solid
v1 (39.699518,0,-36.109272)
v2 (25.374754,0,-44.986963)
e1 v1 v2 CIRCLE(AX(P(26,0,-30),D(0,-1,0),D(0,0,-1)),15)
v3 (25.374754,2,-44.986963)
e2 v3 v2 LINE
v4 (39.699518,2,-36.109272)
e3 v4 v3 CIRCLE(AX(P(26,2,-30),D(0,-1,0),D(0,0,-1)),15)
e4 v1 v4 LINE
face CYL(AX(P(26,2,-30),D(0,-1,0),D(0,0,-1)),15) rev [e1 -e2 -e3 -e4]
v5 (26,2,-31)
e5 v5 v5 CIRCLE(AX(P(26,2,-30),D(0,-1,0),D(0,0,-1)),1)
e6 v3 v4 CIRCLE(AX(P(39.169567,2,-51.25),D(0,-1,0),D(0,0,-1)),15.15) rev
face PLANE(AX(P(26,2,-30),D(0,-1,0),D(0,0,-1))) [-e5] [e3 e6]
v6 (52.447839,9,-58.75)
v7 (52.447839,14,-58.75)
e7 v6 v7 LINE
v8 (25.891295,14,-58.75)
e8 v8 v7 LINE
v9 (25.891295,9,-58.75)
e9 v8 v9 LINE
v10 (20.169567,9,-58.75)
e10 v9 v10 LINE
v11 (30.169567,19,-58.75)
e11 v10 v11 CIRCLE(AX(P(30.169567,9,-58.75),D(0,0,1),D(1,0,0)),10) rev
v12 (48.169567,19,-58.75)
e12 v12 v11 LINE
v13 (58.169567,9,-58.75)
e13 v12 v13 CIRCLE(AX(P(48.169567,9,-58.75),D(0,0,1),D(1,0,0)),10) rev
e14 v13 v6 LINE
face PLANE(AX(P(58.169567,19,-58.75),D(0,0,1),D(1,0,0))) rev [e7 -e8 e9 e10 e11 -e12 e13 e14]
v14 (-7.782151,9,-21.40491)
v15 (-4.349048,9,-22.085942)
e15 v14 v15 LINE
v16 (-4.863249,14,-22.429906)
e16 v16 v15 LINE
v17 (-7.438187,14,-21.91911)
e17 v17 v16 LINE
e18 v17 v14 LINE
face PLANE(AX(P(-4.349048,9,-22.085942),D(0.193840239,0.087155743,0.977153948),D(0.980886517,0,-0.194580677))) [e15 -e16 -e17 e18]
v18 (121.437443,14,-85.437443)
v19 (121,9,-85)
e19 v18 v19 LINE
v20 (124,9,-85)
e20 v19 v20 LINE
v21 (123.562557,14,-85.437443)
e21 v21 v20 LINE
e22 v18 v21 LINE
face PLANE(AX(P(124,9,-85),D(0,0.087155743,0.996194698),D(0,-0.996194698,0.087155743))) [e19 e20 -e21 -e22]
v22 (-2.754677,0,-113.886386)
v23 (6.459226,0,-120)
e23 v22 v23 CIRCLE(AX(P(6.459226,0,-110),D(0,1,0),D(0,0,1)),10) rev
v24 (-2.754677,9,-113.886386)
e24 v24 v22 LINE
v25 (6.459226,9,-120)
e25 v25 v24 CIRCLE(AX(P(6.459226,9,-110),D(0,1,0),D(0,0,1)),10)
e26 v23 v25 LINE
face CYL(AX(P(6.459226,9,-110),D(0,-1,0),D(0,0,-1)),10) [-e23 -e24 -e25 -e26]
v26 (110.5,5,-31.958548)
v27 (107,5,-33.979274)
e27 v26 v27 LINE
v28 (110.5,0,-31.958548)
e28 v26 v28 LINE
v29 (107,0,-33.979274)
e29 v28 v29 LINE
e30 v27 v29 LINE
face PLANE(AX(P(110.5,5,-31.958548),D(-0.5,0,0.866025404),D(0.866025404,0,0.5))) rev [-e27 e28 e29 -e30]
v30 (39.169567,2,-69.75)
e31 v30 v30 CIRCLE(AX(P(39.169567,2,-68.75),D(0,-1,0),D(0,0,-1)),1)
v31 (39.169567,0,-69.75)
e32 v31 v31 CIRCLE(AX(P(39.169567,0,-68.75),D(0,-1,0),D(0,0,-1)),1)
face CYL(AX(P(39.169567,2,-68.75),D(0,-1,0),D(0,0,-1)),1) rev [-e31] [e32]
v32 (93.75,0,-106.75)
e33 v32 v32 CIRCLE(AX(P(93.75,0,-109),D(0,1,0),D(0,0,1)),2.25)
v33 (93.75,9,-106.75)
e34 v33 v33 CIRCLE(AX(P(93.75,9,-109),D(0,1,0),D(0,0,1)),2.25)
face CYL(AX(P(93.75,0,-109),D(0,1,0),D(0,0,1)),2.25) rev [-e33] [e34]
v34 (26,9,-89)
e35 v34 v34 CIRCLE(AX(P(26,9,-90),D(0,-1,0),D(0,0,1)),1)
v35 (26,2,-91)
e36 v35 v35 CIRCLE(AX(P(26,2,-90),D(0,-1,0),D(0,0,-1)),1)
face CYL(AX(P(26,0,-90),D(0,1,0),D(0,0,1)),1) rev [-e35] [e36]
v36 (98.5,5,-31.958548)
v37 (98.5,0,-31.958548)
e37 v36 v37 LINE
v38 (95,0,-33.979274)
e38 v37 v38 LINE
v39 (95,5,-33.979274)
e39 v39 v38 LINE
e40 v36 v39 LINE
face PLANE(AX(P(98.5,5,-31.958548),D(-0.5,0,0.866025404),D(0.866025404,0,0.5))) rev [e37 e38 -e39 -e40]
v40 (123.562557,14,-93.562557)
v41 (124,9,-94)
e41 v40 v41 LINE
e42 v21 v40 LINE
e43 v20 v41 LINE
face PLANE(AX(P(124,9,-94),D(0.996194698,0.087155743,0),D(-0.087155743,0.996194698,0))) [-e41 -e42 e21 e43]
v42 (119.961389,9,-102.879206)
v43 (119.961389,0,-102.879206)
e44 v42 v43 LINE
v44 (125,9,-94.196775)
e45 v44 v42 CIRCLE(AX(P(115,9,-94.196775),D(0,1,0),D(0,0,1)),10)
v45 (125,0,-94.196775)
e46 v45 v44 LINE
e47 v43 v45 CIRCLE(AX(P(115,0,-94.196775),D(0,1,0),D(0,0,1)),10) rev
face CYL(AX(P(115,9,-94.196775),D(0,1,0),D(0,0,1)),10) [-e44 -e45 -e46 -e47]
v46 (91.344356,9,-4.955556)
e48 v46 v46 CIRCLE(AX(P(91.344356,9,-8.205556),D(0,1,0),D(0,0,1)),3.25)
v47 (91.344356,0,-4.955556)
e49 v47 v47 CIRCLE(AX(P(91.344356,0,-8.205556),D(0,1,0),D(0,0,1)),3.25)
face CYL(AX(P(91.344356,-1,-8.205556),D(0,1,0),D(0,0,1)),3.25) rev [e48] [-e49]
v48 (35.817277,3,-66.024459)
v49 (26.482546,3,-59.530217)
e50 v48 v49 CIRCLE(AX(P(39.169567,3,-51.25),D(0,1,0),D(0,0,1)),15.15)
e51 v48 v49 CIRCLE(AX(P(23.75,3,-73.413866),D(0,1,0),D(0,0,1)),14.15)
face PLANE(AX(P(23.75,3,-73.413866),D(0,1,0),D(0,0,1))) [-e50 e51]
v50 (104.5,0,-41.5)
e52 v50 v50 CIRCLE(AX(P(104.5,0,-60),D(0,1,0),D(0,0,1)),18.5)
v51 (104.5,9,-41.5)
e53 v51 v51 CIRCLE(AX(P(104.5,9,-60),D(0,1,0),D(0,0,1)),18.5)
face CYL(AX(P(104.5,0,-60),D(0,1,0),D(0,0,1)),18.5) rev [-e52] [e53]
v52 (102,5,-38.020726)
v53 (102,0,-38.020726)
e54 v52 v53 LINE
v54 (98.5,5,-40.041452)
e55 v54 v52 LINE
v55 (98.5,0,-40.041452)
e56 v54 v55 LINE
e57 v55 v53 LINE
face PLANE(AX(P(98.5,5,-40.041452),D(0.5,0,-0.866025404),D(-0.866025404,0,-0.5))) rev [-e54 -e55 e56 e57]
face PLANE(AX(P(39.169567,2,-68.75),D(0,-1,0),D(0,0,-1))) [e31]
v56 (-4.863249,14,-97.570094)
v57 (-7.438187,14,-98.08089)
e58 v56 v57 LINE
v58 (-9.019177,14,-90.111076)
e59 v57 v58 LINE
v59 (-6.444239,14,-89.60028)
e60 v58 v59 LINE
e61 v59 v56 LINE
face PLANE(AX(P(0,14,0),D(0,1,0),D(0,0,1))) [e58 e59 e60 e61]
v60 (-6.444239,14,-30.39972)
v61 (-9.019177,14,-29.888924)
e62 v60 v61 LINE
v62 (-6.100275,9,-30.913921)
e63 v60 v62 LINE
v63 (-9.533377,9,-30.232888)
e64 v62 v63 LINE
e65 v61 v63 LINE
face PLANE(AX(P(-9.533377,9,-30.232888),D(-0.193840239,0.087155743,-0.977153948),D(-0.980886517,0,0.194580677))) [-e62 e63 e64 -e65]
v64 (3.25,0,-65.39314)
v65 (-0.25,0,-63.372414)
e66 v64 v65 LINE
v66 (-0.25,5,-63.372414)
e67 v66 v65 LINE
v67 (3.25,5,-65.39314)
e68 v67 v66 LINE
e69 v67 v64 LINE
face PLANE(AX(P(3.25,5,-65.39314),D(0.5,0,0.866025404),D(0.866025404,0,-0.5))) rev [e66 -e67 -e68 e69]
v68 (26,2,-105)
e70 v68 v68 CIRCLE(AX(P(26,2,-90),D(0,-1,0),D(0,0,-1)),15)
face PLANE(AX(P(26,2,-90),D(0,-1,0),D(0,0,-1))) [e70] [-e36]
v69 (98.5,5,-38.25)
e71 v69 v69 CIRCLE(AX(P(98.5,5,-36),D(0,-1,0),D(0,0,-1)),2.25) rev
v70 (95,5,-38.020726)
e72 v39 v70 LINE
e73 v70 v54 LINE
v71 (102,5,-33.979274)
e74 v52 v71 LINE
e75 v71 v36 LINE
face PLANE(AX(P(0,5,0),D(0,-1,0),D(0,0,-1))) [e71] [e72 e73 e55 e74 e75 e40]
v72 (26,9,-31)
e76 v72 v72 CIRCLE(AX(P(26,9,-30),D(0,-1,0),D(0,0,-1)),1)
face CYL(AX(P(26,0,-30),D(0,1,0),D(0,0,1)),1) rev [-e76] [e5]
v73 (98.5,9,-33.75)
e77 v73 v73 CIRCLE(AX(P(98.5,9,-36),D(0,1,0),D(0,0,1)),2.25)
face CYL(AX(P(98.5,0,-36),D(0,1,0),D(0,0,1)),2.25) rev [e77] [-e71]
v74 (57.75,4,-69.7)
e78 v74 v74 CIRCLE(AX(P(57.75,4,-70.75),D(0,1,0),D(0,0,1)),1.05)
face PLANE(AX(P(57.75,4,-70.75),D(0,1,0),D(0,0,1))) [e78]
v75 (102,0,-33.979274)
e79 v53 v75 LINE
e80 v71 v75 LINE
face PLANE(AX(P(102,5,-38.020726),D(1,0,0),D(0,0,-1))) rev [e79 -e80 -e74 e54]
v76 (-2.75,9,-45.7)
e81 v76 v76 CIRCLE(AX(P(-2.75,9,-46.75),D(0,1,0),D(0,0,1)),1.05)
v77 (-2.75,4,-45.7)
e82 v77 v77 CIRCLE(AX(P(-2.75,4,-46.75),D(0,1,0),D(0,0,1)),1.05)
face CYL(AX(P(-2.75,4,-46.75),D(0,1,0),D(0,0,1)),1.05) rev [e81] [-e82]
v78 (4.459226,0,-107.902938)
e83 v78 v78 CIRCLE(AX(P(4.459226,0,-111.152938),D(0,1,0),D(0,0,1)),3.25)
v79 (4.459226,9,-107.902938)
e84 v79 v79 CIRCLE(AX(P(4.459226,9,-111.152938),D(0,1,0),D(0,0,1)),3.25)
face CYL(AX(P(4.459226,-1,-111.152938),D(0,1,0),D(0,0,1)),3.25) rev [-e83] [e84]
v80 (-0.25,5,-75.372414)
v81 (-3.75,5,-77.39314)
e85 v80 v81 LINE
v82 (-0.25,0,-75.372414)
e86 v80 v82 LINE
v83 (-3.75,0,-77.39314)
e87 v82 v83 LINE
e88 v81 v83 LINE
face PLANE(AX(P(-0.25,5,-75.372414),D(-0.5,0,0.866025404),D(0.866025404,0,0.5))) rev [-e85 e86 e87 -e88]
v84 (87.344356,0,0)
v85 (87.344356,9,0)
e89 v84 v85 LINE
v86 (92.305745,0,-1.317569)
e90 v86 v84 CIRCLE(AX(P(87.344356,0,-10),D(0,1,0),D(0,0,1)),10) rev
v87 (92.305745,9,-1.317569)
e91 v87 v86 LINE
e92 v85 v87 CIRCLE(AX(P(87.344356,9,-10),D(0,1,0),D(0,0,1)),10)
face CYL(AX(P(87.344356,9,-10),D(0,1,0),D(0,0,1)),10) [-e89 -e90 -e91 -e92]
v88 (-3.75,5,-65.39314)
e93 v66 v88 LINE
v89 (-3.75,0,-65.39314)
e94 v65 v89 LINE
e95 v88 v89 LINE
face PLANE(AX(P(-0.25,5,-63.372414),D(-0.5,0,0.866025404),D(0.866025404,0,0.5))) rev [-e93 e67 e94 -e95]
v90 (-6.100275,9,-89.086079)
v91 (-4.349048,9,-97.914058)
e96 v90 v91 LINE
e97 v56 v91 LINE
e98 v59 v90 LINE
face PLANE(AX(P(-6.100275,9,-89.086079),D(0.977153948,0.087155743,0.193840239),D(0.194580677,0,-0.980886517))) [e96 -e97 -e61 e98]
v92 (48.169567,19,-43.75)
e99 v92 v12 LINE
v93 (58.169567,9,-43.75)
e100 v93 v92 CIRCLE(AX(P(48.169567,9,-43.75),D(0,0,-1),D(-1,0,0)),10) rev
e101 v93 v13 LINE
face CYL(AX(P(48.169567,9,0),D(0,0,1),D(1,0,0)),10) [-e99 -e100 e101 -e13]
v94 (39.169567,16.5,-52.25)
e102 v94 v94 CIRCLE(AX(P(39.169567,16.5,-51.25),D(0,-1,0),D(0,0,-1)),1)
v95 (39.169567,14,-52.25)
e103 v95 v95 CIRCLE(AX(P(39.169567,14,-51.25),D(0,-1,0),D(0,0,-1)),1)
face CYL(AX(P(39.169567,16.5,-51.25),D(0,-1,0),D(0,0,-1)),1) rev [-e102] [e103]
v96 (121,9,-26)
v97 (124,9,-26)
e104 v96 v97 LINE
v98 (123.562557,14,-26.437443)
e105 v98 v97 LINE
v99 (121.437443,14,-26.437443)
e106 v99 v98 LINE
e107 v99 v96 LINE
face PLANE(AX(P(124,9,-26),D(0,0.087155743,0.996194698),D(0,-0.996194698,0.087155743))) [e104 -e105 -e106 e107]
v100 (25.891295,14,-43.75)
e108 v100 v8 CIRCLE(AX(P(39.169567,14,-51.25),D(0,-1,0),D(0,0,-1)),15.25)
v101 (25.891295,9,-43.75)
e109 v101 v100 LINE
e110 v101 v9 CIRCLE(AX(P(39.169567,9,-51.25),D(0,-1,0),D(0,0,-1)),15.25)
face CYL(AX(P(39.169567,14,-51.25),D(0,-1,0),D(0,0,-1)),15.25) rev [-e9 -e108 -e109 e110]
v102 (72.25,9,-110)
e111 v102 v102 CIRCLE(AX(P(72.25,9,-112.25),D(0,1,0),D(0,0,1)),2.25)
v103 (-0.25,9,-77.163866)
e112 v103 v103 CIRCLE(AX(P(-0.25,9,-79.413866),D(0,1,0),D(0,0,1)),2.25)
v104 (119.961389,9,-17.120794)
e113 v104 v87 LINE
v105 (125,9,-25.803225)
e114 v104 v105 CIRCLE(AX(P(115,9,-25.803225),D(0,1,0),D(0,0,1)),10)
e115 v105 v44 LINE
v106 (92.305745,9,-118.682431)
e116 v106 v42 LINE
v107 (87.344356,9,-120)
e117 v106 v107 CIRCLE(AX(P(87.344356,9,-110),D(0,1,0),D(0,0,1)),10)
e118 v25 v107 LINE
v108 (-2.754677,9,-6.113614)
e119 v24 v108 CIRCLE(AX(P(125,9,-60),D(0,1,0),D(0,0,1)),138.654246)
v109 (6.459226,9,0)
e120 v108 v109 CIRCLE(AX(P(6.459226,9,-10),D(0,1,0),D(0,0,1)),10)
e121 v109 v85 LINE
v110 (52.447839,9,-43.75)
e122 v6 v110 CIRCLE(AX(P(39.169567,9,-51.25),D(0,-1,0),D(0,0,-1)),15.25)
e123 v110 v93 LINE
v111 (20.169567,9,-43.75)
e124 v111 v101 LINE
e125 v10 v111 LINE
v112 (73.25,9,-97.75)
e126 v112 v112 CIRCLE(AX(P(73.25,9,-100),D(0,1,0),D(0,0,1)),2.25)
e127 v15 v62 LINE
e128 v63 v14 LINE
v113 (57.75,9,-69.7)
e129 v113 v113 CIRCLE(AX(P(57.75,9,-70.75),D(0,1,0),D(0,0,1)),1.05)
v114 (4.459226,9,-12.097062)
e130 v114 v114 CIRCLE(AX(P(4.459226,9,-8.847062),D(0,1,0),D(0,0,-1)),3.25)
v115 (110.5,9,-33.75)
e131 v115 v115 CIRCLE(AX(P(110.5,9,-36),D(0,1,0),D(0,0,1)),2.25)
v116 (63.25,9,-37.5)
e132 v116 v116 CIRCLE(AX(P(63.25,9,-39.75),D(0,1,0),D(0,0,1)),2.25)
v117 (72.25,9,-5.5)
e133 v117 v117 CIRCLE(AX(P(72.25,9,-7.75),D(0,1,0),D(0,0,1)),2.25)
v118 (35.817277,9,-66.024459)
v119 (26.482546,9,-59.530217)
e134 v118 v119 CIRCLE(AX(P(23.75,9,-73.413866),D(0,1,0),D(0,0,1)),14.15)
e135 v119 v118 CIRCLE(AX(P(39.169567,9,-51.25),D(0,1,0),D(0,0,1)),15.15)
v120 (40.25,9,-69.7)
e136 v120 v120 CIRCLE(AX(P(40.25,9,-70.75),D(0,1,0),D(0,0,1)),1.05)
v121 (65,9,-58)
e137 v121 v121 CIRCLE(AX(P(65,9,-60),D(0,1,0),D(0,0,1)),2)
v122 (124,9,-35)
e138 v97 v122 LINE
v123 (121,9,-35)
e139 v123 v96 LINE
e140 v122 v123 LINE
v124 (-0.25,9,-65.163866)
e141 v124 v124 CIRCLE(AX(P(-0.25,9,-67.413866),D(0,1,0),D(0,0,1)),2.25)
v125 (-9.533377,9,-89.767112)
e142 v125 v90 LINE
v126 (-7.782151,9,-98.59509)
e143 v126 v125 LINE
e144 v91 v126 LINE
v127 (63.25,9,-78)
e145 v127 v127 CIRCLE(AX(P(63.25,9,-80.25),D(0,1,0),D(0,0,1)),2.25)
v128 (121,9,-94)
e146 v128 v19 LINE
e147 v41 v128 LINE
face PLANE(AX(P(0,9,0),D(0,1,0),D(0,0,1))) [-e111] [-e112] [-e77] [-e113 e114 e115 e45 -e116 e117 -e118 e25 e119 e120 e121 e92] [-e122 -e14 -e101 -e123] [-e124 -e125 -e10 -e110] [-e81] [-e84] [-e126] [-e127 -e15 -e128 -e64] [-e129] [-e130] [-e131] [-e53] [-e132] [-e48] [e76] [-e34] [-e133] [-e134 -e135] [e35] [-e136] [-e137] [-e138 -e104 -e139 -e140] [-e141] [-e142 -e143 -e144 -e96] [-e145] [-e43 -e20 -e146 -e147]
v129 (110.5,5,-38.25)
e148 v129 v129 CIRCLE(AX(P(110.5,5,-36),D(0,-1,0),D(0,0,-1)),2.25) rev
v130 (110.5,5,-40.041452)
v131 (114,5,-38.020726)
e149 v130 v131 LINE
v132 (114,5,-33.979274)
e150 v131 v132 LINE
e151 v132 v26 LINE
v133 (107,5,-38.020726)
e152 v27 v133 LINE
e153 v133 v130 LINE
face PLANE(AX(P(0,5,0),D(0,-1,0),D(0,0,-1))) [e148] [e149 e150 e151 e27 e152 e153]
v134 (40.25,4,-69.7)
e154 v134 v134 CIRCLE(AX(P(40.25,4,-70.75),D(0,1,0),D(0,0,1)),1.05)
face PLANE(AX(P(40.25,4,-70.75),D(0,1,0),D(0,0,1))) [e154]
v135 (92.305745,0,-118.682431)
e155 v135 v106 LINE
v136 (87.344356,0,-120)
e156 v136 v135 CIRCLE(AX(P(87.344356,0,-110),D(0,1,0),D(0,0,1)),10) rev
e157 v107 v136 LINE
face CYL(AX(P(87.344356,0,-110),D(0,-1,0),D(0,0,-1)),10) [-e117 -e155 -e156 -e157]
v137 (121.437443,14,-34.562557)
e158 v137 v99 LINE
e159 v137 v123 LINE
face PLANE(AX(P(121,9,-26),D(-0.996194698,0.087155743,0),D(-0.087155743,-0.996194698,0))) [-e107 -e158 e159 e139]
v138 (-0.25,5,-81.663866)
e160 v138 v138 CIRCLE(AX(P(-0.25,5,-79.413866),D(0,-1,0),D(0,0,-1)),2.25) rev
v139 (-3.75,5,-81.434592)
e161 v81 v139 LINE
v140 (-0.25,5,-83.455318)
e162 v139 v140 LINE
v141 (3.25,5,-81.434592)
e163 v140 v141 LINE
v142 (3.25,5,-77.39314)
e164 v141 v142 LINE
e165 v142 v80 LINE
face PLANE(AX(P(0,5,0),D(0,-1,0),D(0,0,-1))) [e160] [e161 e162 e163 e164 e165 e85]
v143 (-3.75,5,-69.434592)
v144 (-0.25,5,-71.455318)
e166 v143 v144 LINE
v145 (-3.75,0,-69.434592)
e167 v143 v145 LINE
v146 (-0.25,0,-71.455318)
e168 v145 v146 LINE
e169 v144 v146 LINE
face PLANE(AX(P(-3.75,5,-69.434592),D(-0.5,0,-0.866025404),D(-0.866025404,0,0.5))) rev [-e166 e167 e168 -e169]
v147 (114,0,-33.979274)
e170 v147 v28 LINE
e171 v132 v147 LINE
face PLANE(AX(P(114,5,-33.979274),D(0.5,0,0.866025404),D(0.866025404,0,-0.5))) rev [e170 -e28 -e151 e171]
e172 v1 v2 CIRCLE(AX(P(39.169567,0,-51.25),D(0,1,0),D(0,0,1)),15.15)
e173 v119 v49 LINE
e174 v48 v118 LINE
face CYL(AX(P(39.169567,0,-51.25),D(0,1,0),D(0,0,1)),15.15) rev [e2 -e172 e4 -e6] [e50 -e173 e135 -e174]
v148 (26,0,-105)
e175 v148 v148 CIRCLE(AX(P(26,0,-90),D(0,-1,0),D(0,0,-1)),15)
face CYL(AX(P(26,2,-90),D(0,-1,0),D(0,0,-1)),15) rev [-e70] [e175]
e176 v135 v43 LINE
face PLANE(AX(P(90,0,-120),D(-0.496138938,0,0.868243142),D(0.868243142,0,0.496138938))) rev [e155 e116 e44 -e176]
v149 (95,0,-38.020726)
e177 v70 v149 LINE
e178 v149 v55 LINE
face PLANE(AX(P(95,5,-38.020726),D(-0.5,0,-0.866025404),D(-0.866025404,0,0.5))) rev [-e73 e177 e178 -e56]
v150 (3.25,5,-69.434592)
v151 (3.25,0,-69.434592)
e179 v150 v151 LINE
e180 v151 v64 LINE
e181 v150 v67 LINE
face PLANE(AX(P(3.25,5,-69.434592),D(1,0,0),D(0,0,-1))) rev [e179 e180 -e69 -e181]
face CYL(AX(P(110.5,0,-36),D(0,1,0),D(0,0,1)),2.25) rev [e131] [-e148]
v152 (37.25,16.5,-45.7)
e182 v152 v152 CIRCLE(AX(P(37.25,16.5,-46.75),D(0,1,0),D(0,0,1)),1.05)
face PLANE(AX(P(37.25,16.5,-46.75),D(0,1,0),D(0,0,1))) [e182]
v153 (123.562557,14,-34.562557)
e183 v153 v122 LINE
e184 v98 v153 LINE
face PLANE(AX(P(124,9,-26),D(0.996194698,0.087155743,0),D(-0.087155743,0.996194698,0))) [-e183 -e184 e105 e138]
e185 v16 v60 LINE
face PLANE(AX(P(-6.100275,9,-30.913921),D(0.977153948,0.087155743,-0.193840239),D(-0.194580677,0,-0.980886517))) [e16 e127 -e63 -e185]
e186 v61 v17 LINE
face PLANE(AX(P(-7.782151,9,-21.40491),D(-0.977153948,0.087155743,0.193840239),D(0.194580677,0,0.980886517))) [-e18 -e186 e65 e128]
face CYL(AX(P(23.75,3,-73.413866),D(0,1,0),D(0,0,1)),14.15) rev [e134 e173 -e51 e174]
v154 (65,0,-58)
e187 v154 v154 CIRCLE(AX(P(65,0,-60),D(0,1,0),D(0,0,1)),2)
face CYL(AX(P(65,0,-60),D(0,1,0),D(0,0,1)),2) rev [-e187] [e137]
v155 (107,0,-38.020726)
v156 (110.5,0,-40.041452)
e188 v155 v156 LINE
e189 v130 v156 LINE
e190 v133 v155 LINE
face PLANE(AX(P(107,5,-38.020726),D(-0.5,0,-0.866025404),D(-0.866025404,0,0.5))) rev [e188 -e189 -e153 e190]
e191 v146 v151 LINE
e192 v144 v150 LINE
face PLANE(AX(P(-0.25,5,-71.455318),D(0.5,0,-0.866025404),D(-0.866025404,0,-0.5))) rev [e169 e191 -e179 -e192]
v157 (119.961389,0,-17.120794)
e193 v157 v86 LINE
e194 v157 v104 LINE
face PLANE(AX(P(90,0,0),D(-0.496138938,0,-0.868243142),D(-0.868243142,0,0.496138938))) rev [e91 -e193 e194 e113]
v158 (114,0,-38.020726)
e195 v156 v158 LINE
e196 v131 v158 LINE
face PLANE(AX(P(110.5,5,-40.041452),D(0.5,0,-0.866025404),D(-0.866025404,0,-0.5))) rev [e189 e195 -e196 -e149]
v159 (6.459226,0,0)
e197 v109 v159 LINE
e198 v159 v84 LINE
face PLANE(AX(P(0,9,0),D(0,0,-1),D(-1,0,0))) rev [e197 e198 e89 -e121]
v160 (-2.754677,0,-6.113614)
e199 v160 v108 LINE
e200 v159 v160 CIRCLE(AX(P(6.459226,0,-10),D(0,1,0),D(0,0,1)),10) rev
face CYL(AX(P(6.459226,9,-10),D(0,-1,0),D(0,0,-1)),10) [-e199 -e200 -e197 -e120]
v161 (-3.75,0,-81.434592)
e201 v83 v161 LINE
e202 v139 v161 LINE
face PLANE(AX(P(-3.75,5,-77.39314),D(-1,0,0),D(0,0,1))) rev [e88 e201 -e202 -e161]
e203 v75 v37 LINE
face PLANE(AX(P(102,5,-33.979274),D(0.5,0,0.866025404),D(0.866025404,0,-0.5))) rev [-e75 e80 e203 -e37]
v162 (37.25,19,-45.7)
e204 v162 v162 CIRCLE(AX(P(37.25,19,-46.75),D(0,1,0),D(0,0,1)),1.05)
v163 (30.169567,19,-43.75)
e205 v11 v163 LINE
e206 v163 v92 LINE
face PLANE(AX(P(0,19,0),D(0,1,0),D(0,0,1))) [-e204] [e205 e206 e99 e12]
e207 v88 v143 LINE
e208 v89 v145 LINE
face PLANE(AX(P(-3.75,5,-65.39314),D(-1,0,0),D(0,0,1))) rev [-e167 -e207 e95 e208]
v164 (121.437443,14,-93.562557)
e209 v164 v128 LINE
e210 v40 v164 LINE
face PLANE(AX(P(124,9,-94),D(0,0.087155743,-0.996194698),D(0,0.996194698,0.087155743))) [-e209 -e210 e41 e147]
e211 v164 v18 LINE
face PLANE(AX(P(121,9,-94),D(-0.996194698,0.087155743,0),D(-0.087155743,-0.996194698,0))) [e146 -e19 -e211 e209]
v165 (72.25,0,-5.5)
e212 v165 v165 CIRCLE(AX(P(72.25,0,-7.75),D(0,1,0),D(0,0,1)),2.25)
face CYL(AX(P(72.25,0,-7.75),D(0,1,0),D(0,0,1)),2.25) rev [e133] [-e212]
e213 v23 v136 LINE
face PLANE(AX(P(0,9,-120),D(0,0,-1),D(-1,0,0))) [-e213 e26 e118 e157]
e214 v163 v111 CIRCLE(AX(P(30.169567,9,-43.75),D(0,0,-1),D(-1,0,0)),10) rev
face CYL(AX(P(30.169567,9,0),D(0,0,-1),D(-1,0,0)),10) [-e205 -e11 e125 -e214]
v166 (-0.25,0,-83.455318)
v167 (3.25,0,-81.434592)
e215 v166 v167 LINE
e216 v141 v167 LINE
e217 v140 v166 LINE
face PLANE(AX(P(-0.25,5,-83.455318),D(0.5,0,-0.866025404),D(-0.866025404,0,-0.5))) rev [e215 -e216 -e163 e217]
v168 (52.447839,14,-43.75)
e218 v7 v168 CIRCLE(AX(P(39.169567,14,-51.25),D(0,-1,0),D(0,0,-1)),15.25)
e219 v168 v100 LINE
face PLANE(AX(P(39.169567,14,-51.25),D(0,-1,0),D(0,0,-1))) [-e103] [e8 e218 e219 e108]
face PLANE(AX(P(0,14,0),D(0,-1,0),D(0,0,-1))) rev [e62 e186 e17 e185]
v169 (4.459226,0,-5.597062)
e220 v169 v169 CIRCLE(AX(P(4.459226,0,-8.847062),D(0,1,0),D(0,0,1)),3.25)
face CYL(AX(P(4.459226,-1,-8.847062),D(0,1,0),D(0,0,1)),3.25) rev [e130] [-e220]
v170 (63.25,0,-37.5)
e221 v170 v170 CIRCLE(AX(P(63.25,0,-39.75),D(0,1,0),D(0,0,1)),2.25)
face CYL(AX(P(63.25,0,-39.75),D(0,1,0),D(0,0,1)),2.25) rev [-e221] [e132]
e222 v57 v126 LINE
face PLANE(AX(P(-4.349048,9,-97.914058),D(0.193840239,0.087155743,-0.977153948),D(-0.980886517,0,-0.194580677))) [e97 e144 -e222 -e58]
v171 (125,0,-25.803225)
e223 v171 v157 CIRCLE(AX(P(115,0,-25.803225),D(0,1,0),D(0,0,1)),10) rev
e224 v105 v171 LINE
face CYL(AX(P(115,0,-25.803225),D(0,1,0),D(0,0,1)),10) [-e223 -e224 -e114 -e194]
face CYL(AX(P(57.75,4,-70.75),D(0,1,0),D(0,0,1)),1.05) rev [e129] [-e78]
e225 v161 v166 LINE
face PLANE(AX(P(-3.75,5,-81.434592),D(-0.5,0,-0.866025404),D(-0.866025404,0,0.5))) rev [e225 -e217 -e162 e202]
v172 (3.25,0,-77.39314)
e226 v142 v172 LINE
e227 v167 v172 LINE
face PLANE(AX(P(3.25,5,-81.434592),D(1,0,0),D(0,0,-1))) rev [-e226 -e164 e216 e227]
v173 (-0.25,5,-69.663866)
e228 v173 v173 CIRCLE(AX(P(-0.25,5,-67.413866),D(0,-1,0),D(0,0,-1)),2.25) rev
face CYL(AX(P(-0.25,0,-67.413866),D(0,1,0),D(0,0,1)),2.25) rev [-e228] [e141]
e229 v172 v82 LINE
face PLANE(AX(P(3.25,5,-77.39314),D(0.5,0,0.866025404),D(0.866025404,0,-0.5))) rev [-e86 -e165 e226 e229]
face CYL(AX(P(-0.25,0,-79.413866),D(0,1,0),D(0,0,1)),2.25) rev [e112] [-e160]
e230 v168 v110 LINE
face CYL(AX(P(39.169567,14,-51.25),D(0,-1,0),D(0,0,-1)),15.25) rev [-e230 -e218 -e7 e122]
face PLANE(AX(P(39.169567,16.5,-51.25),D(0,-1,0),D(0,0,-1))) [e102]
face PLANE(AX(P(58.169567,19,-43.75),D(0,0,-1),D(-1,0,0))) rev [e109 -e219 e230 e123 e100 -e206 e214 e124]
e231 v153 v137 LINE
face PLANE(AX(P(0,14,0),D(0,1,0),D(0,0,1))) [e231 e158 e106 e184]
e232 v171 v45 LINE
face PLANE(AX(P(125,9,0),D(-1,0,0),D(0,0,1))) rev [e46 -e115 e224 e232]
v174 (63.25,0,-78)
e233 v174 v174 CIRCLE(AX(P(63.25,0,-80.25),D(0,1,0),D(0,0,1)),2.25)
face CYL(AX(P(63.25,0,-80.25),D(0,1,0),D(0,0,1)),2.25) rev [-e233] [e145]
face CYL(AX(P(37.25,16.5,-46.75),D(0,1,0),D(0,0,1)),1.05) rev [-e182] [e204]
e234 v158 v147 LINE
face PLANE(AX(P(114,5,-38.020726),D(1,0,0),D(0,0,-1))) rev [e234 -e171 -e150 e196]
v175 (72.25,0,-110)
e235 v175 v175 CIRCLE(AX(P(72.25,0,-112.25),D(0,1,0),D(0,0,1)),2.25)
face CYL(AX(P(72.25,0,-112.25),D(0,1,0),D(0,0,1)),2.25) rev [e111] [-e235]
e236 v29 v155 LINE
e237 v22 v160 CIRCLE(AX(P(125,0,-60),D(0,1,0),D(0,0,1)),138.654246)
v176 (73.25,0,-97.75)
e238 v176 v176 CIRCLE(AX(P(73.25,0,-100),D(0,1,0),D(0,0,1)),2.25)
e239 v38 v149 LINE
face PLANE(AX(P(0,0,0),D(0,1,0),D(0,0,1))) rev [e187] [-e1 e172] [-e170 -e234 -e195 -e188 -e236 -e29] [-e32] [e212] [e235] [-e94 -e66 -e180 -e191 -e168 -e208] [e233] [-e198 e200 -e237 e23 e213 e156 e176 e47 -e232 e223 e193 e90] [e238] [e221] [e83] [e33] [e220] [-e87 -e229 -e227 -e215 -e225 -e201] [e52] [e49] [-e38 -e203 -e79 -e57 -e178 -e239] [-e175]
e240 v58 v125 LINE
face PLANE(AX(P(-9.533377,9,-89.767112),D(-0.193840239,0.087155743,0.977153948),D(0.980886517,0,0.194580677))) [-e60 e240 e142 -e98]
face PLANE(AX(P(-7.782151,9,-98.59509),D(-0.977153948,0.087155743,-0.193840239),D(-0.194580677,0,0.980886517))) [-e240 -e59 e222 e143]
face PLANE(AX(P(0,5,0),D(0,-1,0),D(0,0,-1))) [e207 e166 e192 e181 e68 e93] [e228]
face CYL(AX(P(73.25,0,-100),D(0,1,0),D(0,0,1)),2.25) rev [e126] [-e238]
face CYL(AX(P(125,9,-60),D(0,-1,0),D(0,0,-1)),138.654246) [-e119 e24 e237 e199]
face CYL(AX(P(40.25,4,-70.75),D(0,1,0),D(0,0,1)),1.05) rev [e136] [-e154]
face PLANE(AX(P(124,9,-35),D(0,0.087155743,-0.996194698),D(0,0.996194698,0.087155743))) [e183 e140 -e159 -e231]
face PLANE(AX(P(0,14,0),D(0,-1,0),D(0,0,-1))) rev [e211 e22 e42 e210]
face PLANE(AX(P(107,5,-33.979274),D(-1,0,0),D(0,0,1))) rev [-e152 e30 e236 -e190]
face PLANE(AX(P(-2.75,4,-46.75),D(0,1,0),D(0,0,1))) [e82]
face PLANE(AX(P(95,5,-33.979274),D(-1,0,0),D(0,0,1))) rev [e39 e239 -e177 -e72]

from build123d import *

# Parameters (mm, degrees)
SKETCH1_W                         = 125
SKETCH1_H                         = 120
TOP_BASE_DEPTH                    = 9
SKETCH5_R                         = 14.15
DRIVE_GEAR_HOLE_DEPTH             = 6
SKETCH28_R                        = 15.15
TWO_STAGE_GEAR_HOLE_DEPTH         = 174.51080658
SKETCH8_R                         = 18.5
XL320_FINGER_KNUCKLE_MOUNT_DEPTH  = 174.51080658
SKETCH26_R                        = 1
STRING_HOLES_DEPTH                = 174.51080658
XL320_MOUNT_HOLES_R               = 2.25
XL320_MOUNT_HOLES_M4_DEPTH        = 174.51080658
AX12_MOUNT_HOLES_R                = 2.25
AX12_MOUNT_HOLES_M4_DEPTH         = 174.51080658
NUTS_M4_DEPTH                     = 5
SKETCH34_R                        = 15
HOLES_FOR_M4_IN_FINGER_GEAR_DEPTH = 2
SKETCH31_W                        = 38
SKETCH31_H                        = 15
BOSS_EXTRUDE1_DEPTH               = 10
SKETCH32_R                        = 15.25
CUT_EXTRUDE5_DEPTH                = 5
SKETCH33_R                        = 1
CUT_EXTRUDE6_DEPTH                = 2.5
FILLET2_R                         = 10
CUT_EXTRUDE8_DEPTH                = 174.565549577
FILLET4_R                         = 10
SKETCH37_R                        = 3.25
CONNECT_HOLES_M6_DEPTH            = 10
SKETCH41_R                        = 2
CONNECT_TO_HOUSE_M4_DEPTH         = 174.565549577
SKETCH42_W                        = 3
SKETCH42_H                        = 9
HOUSING_FITS_DEPTH                = 5
HOUSING_FITS_DRAFT                = 5
HOUSING_FITS_PROFILE_2_DEPTH      = 5
HOUSING_FITS_PROFILE_2_DRAFT      = 5
HOUSING_FITS_PROFILE_3_DEPTH      = 5
HOUSING_FITS_PROFILE_3_DRAFT      = 5
HOUSING_FITS_PROFILE_4_DEPTH      = 5
HOUSING_FITS_PROFILE_4_DRAFT      = 5
SKETCH43_R                        = 1
M2_SHAFT_HOLE_DEPTH               = 2
SKETCH44_R                        = 1.05
CUT_EXTRUDE9_DEPTH                = 5
SKETCH45_R                        = 1.05
CUT_EXTRUDE10_DEPTH               = 2.5


with BuildPart() as part:
    # Sketch1 → Top_Base (new body)
    with BuildSketch(Plane(origin=(0, 0, 0), x_dir=(1, 0, 0), z_dir=(0, 1, 0))):
        with BuildLine():
            ThreePointArc((0, 120), (-13.654246239, 60), (0, 0))
            Line((0, 0), (0, 120))
        make_face()
        with Locations((62.5, 60)):
            Rectangle(SKETCH1_W, SKETCH1_H)
    extrude(amount=TOP_BASE_DEPTH)

    # Sketch5 → Drive_Gear_Hole (cut)
    with BuildSketch(Plane(origin=(0, 9, 0), x_dir=(1, 0, 0), z_dir=(0, 1, 0))):
        with Locations(Location((23.75, 73.41386581, 0), (0, 0, 270))):
            Circle(SKETCH5_R)
    extrude(amount=-DRIVE_GEAR_HOLE_DEPTH, mode=Mode.SUBTRACT)

    # Sketch28 → Two_Stage_Gear_Hole (cut, through all)
    with BuildSketch(Plane(origin=(0, 9, 0), x_dir=(1, 0, 0), z_dir=(0, 1, 0))):
        with Locations(Location((39.169567191, 51.25, 0), (0, 0, 270))):
            Circle(SKETCH28_R)
    extrude(amount=-TWO_STAGE_GEAR_HOLE_DEPTH, mode=Mode.SUBTRACT)

    # Sketch8 → XL320_Finger_Knuckle_Mount (cut, through all)
    with BuildSketch(Plane(origin=(0, 9, 0), x_dir=(1, 0, 0), z_dir=(0, 1, 0))):
        with Locations(Location((104.5, 60, 0), (0, 0, 270))):
            Circle(SKETCH8_R)
    extrude(amount=-XL320_FINGER_KNUCKLE_MOUNT_DEPTH, mode=Mode.SUBTRACT)

    # Sketch26 → String_Holes (cut, through all)
    with BuildSketch(Plane.XZ.offset(-9)):
        with Locations(Location((26, -30, 0), (0, 0, 270))):
            Circle(SKETCH26_R)
        with Locations(Location((26, -90, 0), (0, 0, 90))):
            Circle(SKETCH26_R)
    extrude(amount=STRING_HOLES_DEPTH, mode=Mode.SUBTRACT)

    # XL320_Mount_Holes → XL320_Mount_Holes_(M4) (cut, through all)
    with BuildSketch(Plane(origin=(0, 9, 0), x_dir=(1, 0, 0), z_dir=(0, 1, 0))):
        with Locations(Location((110.5, 36, 0), (0, 0, 270))):
            Circle(XL320_MOUNT_HOLES_R)
        with Locations(Location((98.5, 36, 0), (0, 0, 270))):
            Circle(XL320_MOUNT_HOLES_R)
        with Locations(Location((-0.25, 79.41386581, 0), (0, 0, 270))):
            Circle(XL320_MOUNT_HOLES_R)
        with Locations(Location((-0.25, 67.41386581, 0), (0, 0, 270))):
            Circle(XL320_MOUNT_HOLES_R)
    extrude(amount=-XL320_MOUNT_HOLES_M4_DEPTH, mode=Mode.SUBTRACT)

    # AX12_Mount_Holes → AX12_Mount_Holes_(M4) (cut, through all)
    with BuildSketch(Plane(origin=(0, 9, 0), x_dir=(1, 0, 0), z_dir=(0, 1, 0))):
        with Locations(Location((72.25, 112.25, 0), (0, 0, 270))):
            Circle(AX12_MOUNT_HOLES_R)
        with Locations(Location((63.25, 80.25, 0), (0, 0, 270))):
            Circle(AX12_MOUNT_HOLES_R)
        with Locations(Location((73.25, 100, 0), (0, 0, 270))):
            Circle(AX12_MOUNT_HOLES_R)
        with Locations(Location((93.75, 109, 0), (0, 0, 270))):
            Circle(AX12_MOUNT_HOLES_R)
        with Locations(Location((63.25, 39.75, 0), (0, 0, 270))):
            Circle(AX12_MOUNT_HOLES_R)
        with Locations(Location((72.25, 7.75, 0), (0, 0, 270))):
            Circle(AX12_MOUNT_HOLES_R)
    extrude(amount=-AX12_MOUNT_HOLES_M4_DEPTH, mode=Mode.SUBTRACT)

    # Sketch27 → Nuts_(M4) (cut)
    with BuildSketch(Plane.XZ):
        Polygon((110.5, -31.958548116), (107, -33.979274058), (107, -38.020725942), (110.5, -40.041451884), (114, -38.020725942), (114, -33.979274058), align=None)
        Polygon((98.5, -31.958548116), (95, -33.979274058), (95, -38.020725942), (98.5, -40.041451884), (102, -38.020725942), (102, -33.979274058), align=None)
        Polygon((3.25, -65.393139868), (-0.25, -63.372413926), (-3.75, -65.393139868), (-3.75, -69.434591752), (-0.25, -71.455317694), (3.25, -69.434591752), align=None)
        Polygon((-3.75, -77.393139868), (-3.75, -81.434591752), (-0.25, -83.455317694), (3.25, -81.434591752), (3.25, -77.393139868), (-0.25, -75.372413926), align=None)
    extrude(amount=-NUTS_M4_DEPTH, mode=Mode.SUBTRACT)

    # Sketch34 → Holes_For_M4_In_Finger_Gear (cut)
    with BuildSketch(Plane.XZ):
        with Locations((26, -30)):
            Circle(SKETCH34_R)
        with Locations(Location((26, -90, 0), (0, 0, 270))):
            Circle(SKETCH34_R)
    extrude(amount=-HOLES_FOR_M4_IN_FINGER_GEAR_DEPTH, mode=Mode.SUBTRACT)

    # Sketch31 → Boss-Extrude1 (add)
    with BuildSketch(Plane(origin=(0, 9, 0), x_dir=(1, 0, 0), z_dir=(0, 1, 0))):
        with Locations((39.169567191, 51.25)):
            Rectangle(SKETCH31_W, SKETCH31_H)
    extrude(amount=BOSS_EXTRUDE1_DEPTH)

    # Sketch32 → Cut-Extrude5 (cut)
    with BuildSketch(Plane.XZ.offset(-9)):
        with Locations((39.169567191, -51.25)):
            Circle(SKETCH32_R)
    extrude(amount=-CUT_EXTRUDE5_DEPTH, mode=Mode.SUBTRACT)

    # Sketch33 → Cut-Extrude6 (cut)
    with BuildSketch(Plane.XZ.offset(-14)):
        with Locations(Location((39.169567191, -51.25, 0), (0, 0, 270))):
            Circle(SKETCH33_R)
    extrude(amount=-CUT_EXTRUDE6_DEPTH, mode=Mode.SUBTRACT)

    # Fillet2
    fillet2_edges = [part.edges().sort_by_distance(p)[0] for p in [
        (58.169567191, 19, -51.25),
        (20.169567191, 19, -51.25),
    ]]
    fillet(fillet2_edges, radius=FILLET2_R - 0.0001)  # a hair under: the kernel refuses the full size

    # Sketch36 → Cut-Extrude8 (cut, through all)
    with BuildSketch(Plane(origin=(0, 9, 0), x_dir=(1, 0, 0), z_dir=(0, 1, 0))):
        Polygon((90, 120), (125, 100), (125, 120), align=None)
        Polygon((125, 0), (90, 0), (125, 20), align=None)
    extrude(amount=-CUT_EXTRUDE8_DEPTH, mode=Mode.SUBTRACT)

    # Fillet4
    fillet4_edges = [part.edges().sort_by_distance(p)[0] for p in [
        (90, 4.5, -120),
        (125, 4.5, -100),
        (125, 4.5, -20),
        (90, 4.5, 0),
        (0, 4.5, -120),
        (0, 4.5, 0),
    ]]
    fillet(fillet4_edges, radius=FILLET4_R)

    # Sketch37 → Connect_Holes_(M6) (cut)
    with BuildSketch(Plane(origin=(0, 9, 0), x_dir=(1, 0, 0), z_dir=(0, 1, 0))):
        with Locations(Location((4.459226107, 111.152938298, 0), (0, 0, 270))):
            Circle(SKETCH37_R)
        with Locations(Location((4.459226107, 8.847061702, 0), (0, 0, 270))):
            Circle(SKETCH37_R)
        with Locations(Location((91.344355629, 8.205555711, 0), (0, 0, 270))):
            Circle(SKETCH37_R)
    extrude(amount=-CONNECT_HOLES_M6_DEPTH, mode=Mode.SUBTRACT)

    # Sketch41 → Connect_To_House_(M4) (cut, through all)
    with BuildSketch(Plane(origin=(0, 9, 0), x_dir=(1, 0, 0), z_dir=(0, 1, 0))):
        with Locations(Location((65, 60, 0), (0, 0, 270))):
            Circle(SKETCH41_R)
    extrude(amount=-CONNECT_TO_HOUSE_M4_DEPTH, mode=Mode.SUBTRACT)


with BuildPart() as housing_fits_tool:
    # Sketch42 → Housing_Fits (with draft: the straight prism first)
    with BuildSketch(Plane(origin=(0, 9, 0), x_dir=(1, 0, 0), z_dir=(0, 1, 0))):
        with Locations((122.5, 30.5)):
            Rectangle(SKETCH42_W, SKETCH42_H)
    extrude(amount=HOUSING_FITS_DEPTH)
    # Housing_Fits: the draft: its side faces are tilted about the plane it starts from
    housing_fits_sides = [housing_fits_tool.faces().sort_by_distance(p)[0] for p in [
        (124, 11.5, -30.5),
        (122.5, 11.5, -35),
        (121, 11.5, -30.5),
        (122.5, 11.5, -26),
    ]]
    draft(housing_fits_sides, Plane(origin=(0, 9, 0), x_dir=(1, 0, 0), z_dir=(0, 1, 0)), HOUSING_FITS_DRAFT)


with BuildPart() as part_1:
    add(part.part)

    # Housing_Fits: add housing_fits_tool
    add(housing_fits_tool.part)


with BuildPart() as housing_fits_profile_2_tool:
    # Sketch42 → Housing_Fits profile 2 (with draft: the straight prism first)
    with BuildSketch(Plane(origin=(0, 9, 0), x_dir=(1, 0, 0), z_dir=(0, 1, 0))):
        Polygon((-9.533377338, 30.232888291), (-7.782151246, 21.404909633), (-4.349048435, 22.085942002), (-6.100274527, 30.91392066), align=None)
    extrude(amount=HOUSING_FITS_PROFILE_2_DEPTH)
    # Housing_Fits profile 2: the draft: its side faces are tilted about the plane it starts from
    housing_fits_profile_2_sides = [housing_fits_profile_2_tool.faces().sort_by_distance(p)[0] for p in [
        (-8.657764292, 11.5, -25.818898962),
        (-6.065599841, 11.5, -21.745425818),
        (-5.224661481, 11.5, -26.499931331),
        (-7.816825933, 11.5, -30.573404475),
    ]]
    draft(housing_fits_profile_2_sides, Plane(origin=(0, 9, 0), x_dir=(1, 0, 0), z_dir=(0, 1, 0)), HOUSING_FITS_PROFILE_2_DRAFT)


with BuildPart() as part_2:
    add(part_1.part)

    # Housing_Fits profile 2: add housing_fits_profile_2_tool
    add(housing_fits_profile_2_tool.part)


with BuildPart() as housing_fits_profile_3_tool:
    # Sketch42 → Housing_Fits profile 3 (with draft: the straight prism first)
    with BuildSketch(Plane(origin=(0, 9, 0), x_dir=(1, 0, 0), z_dir=(0, 1, 0))):
        Polygon((-4.349048435, 97.914057998), (-7.782151246, 98.595090367), (-9.533377338, 89.767111709), (-6.100274527, 89.08607934), align=None)
    extrude(amount=HOUSING_FITS_PROFILE_3_DEPTH)
    # Housing_Fits profile 3: the draft: its side faces are tilted about the plane it starts from
    housing_fits_profile_3_sides = [housing_fits_profile_3_tool.faces().sort_by_distance(p)[0] for p in [
        (-6.065599841, 11.5, -98.254574182),
        (-8.657764292, 11.5, -94.181101038),
        (-7.816825933, 11.5, -89.426595525),
        (-5.224661481, 11.5, -93.500068669),
    ]]
    draft(housing_fits_profile_3_sides, Plane(origin=(0, 9, 0), x_dir=(1, 0, 0), z_dir=(0, 1, 0)), HOUSING_FITS_PROFILE_3_DRAFT)


with BuildPart() as part_3:
    add(part_2.part)

    # Housing_Fits profile 3: add housing_fits_profile_3_tool
    add(housing_fits_profile_3_tool.part)


with BuildPart() as housing_fits_profile_4_tool:
    # Sketch42 → Housing_Fits profile 4 (with draft: the straight prism first)
    with BuildSketch(Plane(origin=(0, 9, 0), x_dir=(1, 0, 0), z_dir=(0, 1, 0))):
        with Locations((122.5, 89.5)):
            Rectangle(SKETCH42_W, SKETCH42_H)
    extrude(amount=HOUSING_FITS_PROFILE_4_DEPTH)
    # Housing_Fits profile 4: the draft: its side faces are tilted about the plane it starts from
    housing_fits_profile_4_sides = [housing_fits_profile_4_tool.faces().sort_by_distance(p)[0] for p in [
        (122.5, 11.5, -94),
        (121, 11.5, -89.5),
        (122.5, 11.5, -85),
        (124, 11.5, -89.5),
    ]]
    draft(housing_fits_profile_4_sides, Plane(origin=(0, 9, 0), x_dir=(1, 0, 0), z_dir=(0, 1, 0)), HOUSING_FITS_PROFILE_4_DRAFT)


with BuildPart() as part_4:
    add(part_3.part)

    # Housing_Fits profile 4: add housing_fits_profile_4_tool
    add(housing_fits_profile_4_tool.part)

    # Sketch43 → M2_Shaft_Hole (cut)
    with BuildSketch(Plane.XZ):
        with Locations(Location((39.169567191, -68.75, 0), (0, 0, 270))):
            Circle(SKETCH43_R)
    extrude(amount=-M2_SHAFT_HOLE_DEPTH, mode=Mode.SUBTRACT)

    # Sketch44 → Cut-Extrude9 (cut)
    with BuildSketch(Plane(origin=(0, 9, 0), x_dir=(1, 0, 0), z_dir=(0, 1, 0))):
        with Locations(Location((-2.75, 46.75, 0), (0, 0, 270))):
            Circle(SKETCH44_R)
        with Locations(Location((40.25, 70.75, 0), (0, 0, 270))):
            Circle(SKETCH44_R)
        with Locations(Location((57.75, 70.75, 0), (0, 0, 270))):
            Circle(SKETCH44_R)
    extrude(amount=-CUT_EXTRUDE9_DEPTH, mode=Mode.SUBTRACT)

    # Sketch45 → Cut-Extrude10 (cut)
    with BuildSketch(Plane(origin=(0, 19, 0), x_dir=(1, 0, 0), z_dir=(0, 1, 0))):
        with Locations(Location((37.25, 46.75, 0), (0, 0, 270))):
            Circle(SKETCH45_R)
    extrude(amount=-CUT_EXTRUDE10_DEPTH, mode=Mode.SUBTRACT)


solid = part_4.part
